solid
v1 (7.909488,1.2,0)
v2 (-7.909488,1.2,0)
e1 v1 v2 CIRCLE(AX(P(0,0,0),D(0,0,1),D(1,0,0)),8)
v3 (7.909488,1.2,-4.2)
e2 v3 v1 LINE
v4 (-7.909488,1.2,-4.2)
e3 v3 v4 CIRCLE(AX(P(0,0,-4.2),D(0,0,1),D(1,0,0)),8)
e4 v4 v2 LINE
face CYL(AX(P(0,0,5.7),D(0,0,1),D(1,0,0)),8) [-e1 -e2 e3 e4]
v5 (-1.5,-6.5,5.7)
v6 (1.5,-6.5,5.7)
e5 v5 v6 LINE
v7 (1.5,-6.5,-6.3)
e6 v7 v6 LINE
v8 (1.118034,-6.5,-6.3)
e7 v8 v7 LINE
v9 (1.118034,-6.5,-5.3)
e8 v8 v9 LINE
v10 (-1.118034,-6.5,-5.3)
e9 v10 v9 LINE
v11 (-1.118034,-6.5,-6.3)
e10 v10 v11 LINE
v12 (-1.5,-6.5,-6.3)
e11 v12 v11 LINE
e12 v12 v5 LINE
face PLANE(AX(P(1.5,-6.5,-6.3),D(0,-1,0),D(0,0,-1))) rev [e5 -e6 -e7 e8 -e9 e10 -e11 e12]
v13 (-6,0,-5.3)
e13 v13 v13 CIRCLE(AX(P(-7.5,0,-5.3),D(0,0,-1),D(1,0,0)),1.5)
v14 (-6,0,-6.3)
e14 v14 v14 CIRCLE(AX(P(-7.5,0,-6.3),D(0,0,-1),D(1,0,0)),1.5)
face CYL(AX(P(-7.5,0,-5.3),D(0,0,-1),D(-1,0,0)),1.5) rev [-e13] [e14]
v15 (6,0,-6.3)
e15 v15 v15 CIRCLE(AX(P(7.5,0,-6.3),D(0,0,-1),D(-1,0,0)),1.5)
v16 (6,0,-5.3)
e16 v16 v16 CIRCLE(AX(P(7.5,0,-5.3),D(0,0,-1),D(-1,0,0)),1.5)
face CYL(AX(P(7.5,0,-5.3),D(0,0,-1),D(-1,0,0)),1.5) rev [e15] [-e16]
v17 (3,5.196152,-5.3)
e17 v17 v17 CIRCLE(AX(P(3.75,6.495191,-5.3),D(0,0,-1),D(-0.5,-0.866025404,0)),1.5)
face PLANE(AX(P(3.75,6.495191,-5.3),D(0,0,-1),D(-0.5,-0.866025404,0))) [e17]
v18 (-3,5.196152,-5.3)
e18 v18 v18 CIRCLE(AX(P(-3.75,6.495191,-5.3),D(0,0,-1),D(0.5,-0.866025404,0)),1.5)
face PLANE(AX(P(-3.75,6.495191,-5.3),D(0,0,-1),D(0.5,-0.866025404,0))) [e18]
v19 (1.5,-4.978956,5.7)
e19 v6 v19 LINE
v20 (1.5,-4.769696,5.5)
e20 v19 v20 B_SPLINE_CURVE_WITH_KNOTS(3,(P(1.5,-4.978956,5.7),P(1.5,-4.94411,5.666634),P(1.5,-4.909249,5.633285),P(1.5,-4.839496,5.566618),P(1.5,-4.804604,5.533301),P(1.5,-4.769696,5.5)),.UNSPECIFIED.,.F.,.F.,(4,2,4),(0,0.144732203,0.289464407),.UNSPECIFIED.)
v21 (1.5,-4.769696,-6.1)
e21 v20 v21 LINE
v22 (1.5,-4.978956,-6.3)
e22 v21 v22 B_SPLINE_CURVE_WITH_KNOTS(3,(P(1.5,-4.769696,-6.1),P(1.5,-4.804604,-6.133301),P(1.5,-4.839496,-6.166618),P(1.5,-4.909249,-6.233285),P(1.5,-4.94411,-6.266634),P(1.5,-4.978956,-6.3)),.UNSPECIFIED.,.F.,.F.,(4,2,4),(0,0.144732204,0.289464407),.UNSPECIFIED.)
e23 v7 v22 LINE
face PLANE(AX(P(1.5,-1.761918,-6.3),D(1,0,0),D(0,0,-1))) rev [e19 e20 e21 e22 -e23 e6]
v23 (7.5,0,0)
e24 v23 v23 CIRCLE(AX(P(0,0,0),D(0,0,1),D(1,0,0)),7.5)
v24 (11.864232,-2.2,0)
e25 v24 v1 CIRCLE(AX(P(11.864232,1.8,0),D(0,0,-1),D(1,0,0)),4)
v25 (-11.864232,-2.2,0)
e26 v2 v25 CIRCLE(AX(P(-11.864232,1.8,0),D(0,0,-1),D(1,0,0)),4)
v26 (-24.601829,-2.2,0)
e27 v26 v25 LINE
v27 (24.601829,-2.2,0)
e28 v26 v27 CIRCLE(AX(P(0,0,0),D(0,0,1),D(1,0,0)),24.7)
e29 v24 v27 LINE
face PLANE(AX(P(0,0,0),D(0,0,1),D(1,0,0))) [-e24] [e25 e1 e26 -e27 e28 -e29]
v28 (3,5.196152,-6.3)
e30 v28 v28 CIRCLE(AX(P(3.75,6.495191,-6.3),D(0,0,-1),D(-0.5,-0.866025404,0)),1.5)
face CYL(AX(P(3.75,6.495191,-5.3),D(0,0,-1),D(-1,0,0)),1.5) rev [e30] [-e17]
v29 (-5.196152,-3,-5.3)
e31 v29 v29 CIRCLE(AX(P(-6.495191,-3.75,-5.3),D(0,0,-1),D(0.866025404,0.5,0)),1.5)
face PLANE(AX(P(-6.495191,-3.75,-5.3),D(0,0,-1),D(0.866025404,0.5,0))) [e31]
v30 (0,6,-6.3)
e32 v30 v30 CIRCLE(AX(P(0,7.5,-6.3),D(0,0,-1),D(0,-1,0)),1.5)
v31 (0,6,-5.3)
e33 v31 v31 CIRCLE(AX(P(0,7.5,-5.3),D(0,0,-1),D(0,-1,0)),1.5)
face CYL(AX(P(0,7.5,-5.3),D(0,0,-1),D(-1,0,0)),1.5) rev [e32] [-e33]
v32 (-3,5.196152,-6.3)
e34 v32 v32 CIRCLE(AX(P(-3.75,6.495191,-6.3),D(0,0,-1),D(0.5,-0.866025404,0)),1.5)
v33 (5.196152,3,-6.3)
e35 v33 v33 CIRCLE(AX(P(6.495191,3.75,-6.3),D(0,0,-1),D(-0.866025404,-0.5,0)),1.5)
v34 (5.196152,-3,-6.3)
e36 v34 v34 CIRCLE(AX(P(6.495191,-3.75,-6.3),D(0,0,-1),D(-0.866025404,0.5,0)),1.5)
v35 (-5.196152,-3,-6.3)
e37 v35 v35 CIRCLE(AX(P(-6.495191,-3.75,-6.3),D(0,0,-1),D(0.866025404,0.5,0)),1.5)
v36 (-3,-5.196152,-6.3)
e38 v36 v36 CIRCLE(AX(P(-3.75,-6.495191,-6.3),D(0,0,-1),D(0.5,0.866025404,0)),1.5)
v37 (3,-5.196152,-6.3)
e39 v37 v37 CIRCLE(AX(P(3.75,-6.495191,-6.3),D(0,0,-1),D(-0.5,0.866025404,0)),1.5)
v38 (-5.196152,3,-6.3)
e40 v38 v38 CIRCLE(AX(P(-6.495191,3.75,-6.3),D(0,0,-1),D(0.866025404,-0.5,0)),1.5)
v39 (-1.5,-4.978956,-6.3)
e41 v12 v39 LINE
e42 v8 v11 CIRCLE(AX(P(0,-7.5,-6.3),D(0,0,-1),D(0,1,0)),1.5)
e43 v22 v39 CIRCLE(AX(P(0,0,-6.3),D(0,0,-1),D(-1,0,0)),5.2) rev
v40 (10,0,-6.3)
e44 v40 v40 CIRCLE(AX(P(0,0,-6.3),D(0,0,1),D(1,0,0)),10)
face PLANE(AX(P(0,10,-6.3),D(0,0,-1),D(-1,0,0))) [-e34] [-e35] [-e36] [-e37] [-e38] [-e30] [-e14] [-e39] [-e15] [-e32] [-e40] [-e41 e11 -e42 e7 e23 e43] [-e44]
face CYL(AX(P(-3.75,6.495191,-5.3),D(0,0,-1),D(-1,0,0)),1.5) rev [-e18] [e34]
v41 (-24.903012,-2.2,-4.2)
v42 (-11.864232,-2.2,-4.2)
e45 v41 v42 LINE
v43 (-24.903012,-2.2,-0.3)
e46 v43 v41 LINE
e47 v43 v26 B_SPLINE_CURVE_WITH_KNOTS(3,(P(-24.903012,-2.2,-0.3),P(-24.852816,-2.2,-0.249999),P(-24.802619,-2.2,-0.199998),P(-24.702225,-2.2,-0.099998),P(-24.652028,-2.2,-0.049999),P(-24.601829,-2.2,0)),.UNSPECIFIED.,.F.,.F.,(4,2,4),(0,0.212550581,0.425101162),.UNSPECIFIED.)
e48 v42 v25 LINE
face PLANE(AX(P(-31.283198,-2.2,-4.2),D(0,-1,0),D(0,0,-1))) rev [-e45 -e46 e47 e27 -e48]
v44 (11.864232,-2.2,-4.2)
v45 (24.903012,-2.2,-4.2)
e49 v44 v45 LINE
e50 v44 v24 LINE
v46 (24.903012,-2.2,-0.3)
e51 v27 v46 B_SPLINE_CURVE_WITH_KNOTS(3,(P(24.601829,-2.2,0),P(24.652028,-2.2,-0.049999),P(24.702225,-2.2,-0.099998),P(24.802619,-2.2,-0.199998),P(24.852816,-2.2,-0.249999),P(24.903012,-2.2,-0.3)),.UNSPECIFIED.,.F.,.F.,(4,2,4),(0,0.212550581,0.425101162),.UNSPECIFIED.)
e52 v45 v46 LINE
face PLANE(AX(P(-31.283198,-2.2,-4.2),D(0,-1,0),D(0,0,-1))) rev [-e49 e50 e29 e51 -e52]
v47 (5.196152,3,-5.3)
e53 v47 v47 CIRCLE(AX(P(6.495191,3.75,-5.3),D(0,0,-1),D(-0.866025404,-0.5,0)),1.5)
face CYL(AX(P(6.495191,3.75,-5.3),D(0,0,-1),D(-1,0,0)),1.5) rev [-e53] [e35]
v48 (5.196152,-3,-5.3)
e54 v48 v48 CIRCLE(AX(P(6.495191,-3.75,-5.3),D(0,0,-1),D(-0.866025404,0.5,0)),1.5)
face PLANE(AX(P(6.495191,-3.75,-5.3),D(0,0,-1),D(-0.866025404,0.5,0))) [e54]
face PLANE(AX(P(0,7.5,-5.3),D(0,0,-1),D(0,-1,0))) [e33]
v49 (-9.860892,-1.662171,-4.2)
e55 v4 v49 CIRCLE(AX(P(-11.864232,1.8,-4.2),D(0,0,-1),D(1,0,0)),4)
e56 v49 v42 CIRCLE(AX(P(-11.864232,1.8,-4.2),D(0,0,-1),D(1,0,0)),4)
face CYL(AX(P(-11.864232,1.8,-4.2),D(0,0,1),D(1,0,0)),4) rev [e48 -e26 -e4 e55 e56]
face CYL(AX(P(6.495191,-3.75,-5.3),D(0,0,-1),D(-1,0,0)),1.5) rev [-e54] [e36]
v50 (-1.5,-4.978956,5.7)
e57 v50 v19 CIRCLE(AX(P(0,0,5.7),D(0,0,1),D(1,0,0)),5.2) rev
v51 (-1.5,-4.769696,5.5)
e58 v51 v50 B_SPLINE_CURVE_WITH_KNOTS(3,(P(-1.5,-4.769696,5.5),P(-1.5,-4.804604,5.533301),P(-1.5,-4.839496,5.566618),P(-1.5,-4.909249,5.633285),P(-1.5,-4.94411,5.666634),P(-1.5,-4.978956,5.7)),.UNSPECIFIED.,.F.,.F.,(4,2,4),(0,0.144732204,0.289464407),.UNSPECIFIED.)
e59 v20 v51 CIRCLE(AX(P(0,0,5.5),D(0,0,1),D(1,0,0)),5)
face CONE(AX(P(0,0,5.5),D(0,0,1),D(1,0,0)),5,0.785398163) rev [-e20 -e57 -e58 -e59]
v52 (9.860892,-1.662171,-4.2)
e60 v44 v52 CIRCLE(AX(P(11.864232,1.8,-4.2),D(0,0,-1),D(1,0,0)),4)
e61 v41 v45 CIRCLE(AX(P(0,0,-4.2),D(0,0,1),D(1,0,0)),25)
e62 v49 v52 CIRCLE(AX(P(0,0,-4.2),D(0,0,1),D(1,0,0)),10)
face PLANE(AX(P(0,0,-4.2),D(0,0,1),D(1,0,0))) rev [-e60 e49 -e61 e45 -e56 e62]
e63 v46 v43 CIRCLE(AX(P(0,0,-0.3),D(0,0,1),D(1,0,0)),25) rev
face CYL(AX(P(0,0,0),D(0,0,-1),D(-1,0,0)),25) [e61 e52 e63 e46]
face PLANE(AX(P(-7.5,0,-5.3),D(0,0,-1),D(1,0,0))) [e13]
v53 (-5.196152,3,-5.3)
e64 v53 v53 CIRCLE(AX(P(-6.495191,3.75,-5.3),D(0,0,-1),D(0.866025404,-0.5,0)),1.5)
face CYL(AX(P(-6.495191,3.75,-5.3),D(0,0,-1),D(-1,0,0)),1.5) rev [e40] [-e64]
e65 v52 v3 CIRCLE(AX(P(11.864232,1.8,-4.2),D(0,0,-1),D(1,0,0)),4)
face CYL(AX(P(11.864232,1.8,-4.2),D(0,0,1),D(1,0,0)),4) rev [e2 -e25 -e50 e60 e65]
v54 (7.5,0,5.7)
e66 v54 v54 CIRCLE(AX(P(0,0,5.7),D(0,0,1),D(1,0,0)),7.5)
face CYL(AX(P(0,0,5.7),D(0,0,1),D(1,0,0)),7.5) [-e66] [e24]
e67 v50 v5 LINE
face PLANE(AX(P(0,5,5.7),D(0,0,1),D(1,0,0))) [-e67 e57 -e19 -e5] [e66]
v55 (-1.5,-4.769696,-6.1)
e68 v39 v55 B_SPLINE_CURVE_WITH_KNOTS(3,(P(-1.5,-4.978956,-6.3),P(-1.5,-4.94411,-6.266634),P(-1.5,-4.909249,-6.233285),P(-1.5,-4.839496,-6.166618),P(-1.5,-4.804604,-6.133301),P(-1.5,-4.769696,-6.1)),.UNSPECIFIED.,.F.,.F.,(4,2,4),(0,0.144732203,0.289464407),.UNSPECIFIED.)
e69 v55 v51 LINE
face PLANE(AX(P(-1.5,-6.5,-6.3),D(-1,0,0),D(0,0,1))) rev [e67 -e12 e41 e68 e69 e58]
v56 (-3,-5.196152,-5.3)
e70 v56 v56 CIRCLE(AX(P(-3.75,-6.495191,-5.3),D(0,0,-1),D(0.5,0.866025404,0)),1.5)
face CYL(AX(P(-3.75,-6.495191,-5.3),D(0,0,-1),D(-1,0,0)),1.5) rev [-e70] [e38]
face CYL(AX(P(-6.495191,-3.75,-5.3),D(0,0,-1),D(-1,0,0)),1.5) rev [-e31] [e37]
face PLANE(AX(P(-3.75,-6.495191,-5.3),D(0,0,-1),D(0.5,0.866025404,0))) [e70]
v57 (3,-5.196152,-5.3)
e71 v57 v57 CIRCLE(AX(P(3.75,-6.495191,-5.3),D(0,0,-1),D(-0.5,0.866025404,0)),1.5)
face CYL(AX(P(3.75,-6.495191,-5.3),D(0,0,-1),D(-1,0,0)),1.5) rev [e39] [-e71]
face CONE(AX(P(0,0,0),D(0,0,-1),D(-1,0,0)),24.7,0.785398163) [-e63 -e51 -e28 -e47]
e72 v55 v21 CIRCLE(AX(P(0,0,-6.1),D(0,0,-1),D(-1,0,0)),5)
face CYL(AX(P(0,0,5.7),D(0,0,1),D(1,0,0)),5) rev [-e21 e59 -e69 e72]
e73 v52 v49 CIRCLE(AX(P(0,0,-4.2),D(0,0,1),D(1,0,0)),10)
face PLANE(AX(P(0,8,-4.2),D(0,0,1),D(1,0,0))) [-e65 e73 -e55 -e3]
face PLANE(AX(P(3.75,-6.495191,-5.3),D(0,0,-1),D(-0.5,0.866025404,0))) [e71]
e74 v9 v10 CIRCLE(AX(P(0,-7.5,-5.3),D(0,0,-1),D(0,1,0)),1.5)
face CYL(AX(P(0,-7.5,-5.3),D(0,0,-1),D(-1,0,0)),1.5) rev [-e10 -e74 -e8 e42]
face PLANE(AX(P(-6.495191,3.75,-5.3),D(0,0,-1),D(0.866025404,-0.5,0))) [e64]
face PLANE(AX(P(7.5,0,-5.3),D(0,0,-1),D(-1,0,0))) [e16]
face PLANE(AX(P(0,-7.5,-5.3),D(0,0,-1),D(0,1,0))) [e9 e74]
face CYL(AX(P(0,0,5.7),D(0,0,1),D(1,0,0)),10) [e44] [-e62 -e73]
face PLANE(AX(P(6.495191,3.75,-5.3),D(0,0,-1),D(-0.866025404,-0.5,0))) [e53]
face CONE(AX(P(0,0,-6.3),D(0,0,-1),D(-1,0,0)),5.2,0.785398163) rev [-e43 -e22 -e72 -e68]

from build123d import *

# Parameters (mm, degrees)
JOIN1_START         = -4.2
JOIN1_OUTLINE_R     = 5
JOIN1_DEPTH         = 4.2
JOIN1_START_2       = -6.3
JOIN1_2_OUTLINE_R   = 7.5
JOIN1_2_OUTLINE_R_2 = 5
JOIN1_2_DEPTH       = 12
JOIN1_3_OUTLINE_R   = 10
JOIN1_3_OUTLINE_R_2 = 7.5
JOIN1_3_DEPTH       = 2.1
SKETCH1_W           = 3
SKETCH1_H           = 4.738081577
CUT_EXTRUDE1_DEPTH  = 38.271436785
SKETCH2_R           = 1.5
CUT_EXTRUDE2_DEPTH  = 1
CIRPATTERN1_COUNT   = 12
CHAMFER1_SIZE       = 0.2
CHAMFER2_SIZE       = 0.2
CHAMFER3_SIZE       = 0.3


# Read off the part's stored shape, not the designer's step: Join1
with BuildPart() as part:
    # Join1 outline → Join1 (new body)
    with BuildSketch(Plane.XY.offset(JOIN1_START)):
        with BuildLine():
            ThreePointArc((-24.903011866, -2.2), (0, -25), (24.903011866, -2.2))
            Line((24.903011866, -2.2), (11.86423196, -2.2))
            ThreePointArc((11.86423196, -2.2), (9.256550998, -1.233150178), (7.909487973, 1.2))
            ThreePointArc((7.909487973, 1.2), (0, 8), (-7.909487973, 1.2))
            ThreePointArc((-7.909487973, 1.2), (-9.256550998, -1.233150178), (-11.86423196, -2.2))
            Line((-11.86423196, -2.2), (-24.903011866, -2.2))
        make_face()
        Circle(JOIN1_OUTLINE_R, mode=Mode.SUBTRACT)
    extrude(amount=JOIN1_DEPTH)

    # Join1 2 outline → Join1 2 (add)
    with BuildSketch(Plane.XY.offset(JOIN1_START_2)):
        Circle(JOIN1_2_OUTLINE_R)
        Circle(JOIN1_2_OUTLINE_R_2, mode=Mode.SUBTRACT)
    extrude(amount=JOIN1_2_DEPTH)

    # Join1 3 outline → Join1 3 (add)
    with BuildSketch(Plane.XY.offset(JOIN1_START_2)):
        Circle(JOIN1_3_OUTLINE_R)
        Circle(JOIN1_3_OUTLINE_R_2, mode=Mode.SUBTRACT)
    extrude(amount=JOIN1_3_DEPTH)

    # Sketch1 → Cut-Extrude1 (cut, through all)
    with BuildSketch(Plane.XY.offset(5.7)):
        with Locations((0, -4.130959212)):
            Rectangle(SKETCH1_W, SKETCH1_H)
    extrude(amount=-CUT_EXTRUDE1_DEPTH, mode=Mode.SUBTRACT)

    # Sketch2 → Cut-Extrude2 (cut)
    with BuildSketch(Plane(origin=(0, 0, -6.3), x_dir=(-1, 0, 0), z_dir=(0, 0, -1))):
        with Locations((-7.5, 0)):
            Circle(SKETCH2_R)
    cut_extrude2 = extrude(amount=-CUT_EXTRUDE2_DEPTH, mode=Mode.SUBTRACT)

    # CirPattern1: Cut-Extrude2 ×12 about axis
    cirpattern1_axis = Axis((0, 0, 0), (0, 0, 1))
    for i in range(1, CIRPATTERN1_COUNT):
        add(cut_extrude2.rotate(cirpattern1_axis, i * 360 / CIRPATTERN1_COUNT), mode=Mode.SUBTRACT)

    # Chamfer1
    chamfer1_edges = [part.edges().sort_by_distance(p)[0] for p in [
        (0, 5, 5.7),
    ]]
    chamfer(chamfer1_edges, length=CHAMFER1_SIZE)

    # Chamfer2
    chamfer2_edges = [part.edges().sort_by_distance(p)[0] for p in [
        (0, 5, -6.3),
    ]]
    chamfer(chamfer2_edges, length=CHAMFER2_SIZE)

    # Chamfer3
    chamfer3_edges = [part.edges().sort_by_distance(p)[0] for p in [
        (0, -25, 0),
    ]]
    chamfer(chamfer3_edges, length=CHAMFER3_SIZE)


solid = part.part
